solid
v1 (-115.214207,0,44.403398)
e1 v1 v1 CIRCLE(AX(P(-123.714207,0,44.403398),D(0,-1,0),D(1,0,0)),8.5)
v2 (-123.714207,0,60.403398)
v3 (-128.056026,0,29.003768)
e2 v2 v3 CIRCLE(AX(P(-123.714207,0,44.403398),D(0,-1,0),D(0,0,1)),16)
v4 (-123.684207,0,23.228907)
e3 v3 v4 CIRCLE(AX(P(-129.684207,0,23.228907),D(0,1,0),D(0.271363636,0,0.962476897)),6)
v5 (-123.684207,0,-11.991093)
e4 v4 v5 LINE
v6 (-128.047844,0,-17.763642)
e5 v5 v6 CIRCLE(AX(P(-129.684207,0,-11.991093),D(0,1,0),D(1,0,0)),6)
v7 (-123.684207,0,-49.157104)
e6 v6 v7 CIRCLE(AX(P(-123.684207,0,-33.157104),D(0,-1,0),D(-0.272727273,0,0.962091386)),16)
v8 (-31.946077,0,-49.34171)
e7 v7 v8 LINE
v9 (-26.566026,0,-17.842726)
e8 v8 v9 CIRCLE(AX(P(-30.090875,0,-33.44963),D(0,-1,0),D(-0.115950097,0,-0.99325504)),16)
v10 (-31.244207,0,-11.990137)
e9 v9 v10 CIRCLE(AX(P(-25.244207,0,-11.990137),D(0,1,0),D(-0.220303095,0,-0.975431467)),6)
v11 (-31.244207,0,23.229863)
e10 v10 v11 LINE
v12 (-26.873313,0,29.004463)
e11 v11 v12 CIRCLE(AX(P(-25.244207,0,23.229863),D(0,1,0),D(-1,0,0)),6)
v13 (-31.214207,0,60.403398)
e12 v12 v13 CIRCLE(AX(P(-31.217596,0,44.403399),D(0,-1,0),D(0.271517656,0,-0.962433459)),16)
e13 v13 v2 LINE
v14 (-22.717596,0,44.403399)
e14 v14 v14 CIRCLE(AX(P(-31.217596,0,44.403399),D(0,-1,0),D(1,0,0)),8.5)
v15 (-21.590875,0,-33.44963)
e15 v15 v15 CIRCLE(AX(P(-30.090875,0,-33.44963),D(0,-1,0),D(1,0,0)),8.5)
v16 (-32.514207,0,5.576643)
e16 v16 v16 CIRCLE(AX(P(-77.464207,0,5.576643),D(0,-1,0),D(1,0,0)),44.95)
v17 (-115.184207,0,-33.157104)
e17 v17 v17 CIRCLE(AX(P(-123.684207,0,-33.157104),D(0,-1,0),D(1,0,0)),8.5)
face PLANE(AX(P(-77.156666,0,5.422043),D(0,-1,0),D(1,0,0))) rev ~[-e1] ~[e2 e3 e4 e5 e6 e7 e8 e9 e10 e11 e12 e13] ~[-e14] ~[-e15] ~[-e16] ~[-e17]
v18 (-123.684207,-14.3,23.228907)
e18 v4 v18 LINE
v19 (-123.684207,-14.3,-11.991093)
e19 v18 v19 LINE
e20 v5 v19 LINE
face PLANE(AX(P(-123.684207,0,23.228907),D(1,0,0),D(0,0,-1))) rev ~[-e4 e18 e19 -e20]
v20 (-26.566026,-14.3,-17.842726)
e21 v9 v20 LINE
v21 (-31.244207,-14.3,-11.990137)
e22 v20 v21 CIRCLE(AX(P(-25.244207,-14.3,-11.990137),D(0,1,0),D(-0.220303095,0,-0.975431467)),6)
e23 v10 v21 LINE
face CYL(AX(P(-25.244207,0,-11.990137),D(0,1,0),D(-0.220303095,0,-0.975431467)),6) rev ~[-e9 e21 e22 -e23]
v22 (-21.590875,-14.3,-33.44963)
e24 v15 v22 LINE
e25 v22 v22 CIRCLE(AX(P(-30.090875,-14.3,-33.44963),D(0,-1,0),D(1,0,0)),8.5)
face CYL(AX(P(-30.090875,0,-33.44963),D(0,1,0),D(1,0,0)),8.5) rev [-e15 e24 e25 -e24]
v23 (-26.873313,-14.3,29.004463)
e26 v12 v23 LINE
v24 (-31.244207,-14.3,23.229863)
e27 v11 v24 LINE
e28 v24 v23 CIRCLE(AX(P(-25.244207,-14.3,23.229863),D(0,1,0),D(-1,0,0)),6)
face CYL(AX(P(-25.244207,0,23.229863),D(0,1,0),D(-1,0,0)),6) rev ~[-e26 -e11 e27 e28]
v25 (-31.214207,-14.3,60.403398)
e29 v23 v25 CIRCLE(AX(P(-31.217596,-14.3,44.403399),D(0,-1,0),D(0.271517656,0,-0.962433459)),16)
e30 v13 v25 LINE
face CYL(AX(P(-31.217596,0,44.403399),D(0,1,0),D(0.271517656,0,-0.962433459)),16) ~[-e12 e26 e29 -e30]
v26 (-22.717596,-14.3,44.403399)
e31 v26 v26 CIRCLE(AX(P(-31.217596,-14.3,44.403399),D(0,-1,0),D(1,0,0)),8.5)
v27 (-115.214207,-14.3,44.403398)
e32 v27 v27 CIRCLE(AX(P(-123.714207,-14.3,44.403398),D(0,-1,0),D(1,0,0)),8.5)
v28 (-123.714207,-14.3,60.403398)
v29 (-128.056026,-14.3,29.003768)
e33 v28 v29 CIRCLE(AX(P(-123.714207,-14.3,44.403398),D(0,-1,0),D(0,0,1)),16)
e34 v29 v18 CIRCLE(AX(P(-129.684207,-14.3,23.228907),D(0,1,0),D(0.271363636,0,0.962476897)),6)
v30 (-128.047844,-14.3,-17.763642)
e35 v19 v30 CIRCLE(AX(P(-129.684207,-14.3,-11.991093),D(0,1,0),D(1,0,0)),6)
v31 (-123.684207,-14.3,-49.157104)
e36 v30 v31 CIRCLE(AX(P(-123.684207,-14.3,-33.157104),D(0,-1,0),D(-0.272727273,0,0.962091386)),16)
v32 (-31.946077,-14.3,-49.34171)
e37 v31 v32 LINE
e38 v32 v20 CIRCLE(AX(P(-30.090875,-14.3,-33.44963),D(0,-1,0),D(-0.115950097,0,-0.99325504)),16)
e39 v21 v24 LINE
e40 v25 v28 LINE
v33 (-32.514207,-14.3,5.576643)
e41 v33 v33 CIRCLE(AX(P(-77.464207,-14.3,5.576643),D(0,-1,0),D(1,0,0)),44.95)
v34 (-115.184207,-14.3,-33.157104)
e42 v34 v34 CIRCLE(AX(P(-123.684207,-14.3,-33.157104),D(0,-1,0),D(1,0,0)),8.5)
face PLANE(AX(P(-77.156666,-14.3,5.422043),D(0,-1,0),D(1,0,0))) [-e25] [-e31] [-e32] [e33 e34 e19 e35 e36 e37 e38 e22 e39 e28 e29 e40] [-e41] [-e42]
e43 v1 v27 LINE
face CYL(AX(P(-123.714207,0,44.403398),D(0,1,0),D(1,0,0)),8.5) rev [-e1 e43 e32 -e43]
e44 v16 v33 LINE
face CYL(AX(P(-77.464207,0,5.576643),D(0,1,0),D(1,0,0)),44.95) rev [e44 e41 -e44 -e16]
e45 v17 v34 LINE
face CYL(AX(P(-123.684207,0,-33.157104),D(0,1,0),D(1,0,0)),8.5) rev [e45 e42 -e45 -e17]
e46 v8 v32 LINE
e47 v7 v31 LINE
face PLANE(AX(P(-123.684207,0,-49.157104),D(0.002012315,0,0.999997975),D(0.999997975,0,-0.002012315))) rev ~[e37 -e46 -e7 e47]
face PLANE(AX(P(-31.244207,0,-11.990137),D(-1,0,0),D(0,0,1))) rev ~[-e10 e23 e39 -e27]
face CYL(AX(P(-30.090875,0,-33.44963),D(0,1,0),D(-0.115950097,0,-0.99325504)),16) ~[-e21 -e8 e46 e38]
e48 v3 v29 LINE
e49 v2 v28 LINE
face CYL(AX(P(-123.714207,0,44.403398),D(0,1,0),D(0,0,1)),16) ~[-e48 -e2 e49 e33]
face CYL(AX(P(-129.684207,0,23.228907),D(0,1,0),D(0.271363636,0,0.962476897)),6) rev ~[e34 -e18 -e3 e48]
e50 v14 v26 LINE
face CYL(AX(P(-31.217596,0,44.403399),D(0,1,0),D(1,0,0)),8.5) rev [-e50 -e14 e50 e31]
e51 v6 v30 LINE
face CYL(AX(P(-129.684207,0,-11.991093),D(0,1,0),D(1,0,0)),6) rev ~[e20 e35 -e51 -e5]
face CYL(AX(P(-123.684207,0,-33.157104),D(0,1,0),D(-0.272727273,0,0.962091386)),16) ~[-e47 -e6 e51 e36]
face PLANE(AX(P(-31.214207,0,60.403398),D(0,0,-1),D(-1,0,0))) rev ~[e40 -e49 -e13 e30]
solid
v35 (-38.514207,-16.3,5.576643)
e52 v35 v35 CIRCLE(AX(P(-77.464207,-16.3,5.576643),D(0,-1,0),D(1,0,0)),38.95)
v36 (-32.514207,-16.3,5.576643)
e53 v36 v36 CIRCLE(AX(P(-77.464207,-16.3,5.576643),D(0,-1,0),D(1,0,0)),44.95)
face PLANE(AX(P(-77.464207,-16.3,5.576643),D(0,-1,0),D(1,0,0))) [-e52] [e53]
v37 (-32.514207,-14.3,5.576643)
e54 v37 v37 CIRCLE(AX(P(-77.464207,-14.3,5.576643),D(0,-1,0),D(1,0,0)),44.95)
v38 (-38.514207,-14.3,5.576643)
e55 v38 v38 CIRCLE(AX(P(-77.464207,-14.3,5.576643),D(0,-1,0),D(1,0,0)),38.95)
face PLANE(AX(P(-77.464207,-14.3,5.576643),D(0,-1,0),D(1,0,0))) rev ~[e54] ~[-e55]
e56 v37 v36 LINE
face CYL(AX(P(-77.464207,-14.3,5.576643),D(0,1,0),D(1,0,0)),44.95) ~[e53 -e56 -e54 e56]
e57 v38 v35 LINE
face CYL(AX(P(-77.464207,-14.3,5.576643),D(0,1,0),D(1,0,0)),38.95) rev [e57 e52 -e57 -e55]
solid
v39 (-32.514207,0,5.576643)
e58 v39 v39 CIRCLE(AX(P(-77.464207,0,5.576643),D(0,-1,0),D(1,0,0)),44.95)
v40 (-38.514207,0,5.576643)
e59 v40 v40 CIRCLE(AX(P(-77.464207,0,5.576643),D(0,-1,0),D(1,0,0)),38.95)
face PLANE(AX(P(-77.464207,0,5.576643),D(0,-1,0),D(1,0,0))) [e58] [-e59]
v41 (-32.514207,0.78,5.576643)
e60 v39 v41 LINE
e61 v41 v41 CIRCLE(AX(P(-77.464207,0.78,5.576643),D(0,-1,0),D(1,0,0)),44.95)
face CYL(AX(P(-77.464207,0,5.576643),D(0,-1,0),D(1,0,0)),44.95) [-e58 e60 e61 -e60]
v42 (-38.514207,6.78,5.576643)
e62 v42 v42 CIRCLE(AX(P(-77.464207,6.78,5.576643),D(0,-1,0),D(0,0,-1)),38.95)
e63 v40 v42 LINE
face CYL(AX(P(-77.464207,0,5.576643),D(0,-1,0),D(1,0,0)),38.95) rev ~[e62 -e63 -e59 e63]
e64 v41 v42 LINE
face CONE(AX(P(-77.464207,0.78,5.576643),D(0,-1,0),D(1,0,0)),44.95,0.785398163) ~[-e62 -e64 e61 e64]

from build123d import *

# Parameters (mm, degrees)
F0_R     = 8.5
F0_R_2   = 44.95
F1_DEPTH = 14.3
F0_R_3   = 38.95
F2_DEPTH = 8.4
F3_R     = 44.95
F3_R_2   = 38.95
F4_DEPTH = 2


# Not quite as in the source:
# - a fillet or chamfer that OpenCascade refuses, or shapes differently, is made with other operations: its cross-section is extruded or revolved along the edge and cut away or added


with BuildPart() as f1:
    # F0 (on Front) → F1 (new body)
    with BuildSketch(Plane.XZ):
        with BuildLine():
            Line((-31.2142073288, 60.4033983739), (-123.7142073288, 60.4033983739))
            ThreePointArc((-123.7142073288, 60.4033983739), (-139.5634042419, 46.5949633879), (-128.0560255107, 29.0037680252))
            ThreePointArc((-128.0560255107, 29.0037680252), (-124.9004279177, 26.8504331935), (-123.6842073288, 23.2289066444))
            Line((-123.6842073288, 23.2289066444), (-123.6842073288, -11.9910933556))
            ThreePointArc((-123.6842073288, -11.9910933556), (-124.8978631175, -15.6092294905), (-128.0478436925, -17.7636416706))
            ThreePointArc((-128.0478436925, -17.7636416706), (-139.5318474493, -35.3598981178), (-123.6842073288, -49.1571038441))
            Line((-123.6842073288, -49.1571038441), (-31.9460769585, -49.3417102723))
            ThreePointArc((-31.9460769585, -49.3417102723), (-14.3192733633, -36.1434315621), (-26.5660258966, -17.8427261582))
            ThreePointArc((-26.5660258966, -17.8427261582), (-29.9309392076, -15.7364080757), (-31.2442073288, -11.9901373572))
            Line((-31.2442073288, -11.9901373572), (-31.2442073288, 23.2298626428))
            ThreePointArc((-31.2442073288, 23.2298626428), (-30.0282764979, 26.8510064104), (-26.873313267, 29.0044633946))
            ThreePointArc((-26.873313267, 29.0044633946), (-15.3683421549, 46.5945536538), (-31.2142073288, 60.4033983739))
        make_face()
        with Locations((-123.6842073288, -33.1571038441)):
            Circle(F0_R, mode=Mode.SUBTRACT)
        with Locations((-30.0908754106, -33.4496296276)):
            Circle(F0_R, mode=Mode.SUBTRACT)
        with Locations((-77.4642073288, 5.5766425614)):
            Circle(F0_R_2, mode=Mode.SUBTRACT)
        with Locations((-123.7142073288, 44.4033983739)):
            Circle(F0_R, mode=Mode.SUBTRACT)
        with Locations((-31.2175957686, 44.4033987327)):
            Circle(F0_R, mode=Mode.SUBTRACT)
    extrude(amount=F1_DEPTH)

    # F0 (on Front) → F2 (join)
    with BuildSketch(Plane.XZ):
        with Locations((-77.4642073288, 5.5766425614)):
            Circle(F0_R_2)
        with Locations((-77.4642073288, 5.5766425614)):
            Circle(F0_R_3, mode=Mode.SUBTRACT)
    extrude(amount=-F2_DEPTH)

    # F5: chamfer of 7.62 on 1 edges, made by hand

    # F5_s1 → F5_t2 (revolve, cut)
    with BuildSketch(Plane.XY.offset(5.5766425614)):
        Polygon((-32.5142073288, 0.78), (-40.1342073288, 8.4), (-32.5142073288, 8.4), align=None)
    revolve(axis=Axis((-77.4642073288, 8.4, 5.5766425614), (0, -1, 0)), mode=Mode.SUBTRACT)


with BuildPart() as f4:
    # F3 (on face) → F4 (new body)
    with BuildSketch(Plane.XZ.offset(14.3)):
        with Locations((-77.4642073288, 5.5766425614)):
            Circle(F3_R)
        with Locations((-77.4642073288, 5.5766425614)):
            Circle(F3_R_2, mode=Mode.SUBTRACT)
    extrude(amount=F4_DEPTH)


solid = Compound([f1.part, f4.part])
